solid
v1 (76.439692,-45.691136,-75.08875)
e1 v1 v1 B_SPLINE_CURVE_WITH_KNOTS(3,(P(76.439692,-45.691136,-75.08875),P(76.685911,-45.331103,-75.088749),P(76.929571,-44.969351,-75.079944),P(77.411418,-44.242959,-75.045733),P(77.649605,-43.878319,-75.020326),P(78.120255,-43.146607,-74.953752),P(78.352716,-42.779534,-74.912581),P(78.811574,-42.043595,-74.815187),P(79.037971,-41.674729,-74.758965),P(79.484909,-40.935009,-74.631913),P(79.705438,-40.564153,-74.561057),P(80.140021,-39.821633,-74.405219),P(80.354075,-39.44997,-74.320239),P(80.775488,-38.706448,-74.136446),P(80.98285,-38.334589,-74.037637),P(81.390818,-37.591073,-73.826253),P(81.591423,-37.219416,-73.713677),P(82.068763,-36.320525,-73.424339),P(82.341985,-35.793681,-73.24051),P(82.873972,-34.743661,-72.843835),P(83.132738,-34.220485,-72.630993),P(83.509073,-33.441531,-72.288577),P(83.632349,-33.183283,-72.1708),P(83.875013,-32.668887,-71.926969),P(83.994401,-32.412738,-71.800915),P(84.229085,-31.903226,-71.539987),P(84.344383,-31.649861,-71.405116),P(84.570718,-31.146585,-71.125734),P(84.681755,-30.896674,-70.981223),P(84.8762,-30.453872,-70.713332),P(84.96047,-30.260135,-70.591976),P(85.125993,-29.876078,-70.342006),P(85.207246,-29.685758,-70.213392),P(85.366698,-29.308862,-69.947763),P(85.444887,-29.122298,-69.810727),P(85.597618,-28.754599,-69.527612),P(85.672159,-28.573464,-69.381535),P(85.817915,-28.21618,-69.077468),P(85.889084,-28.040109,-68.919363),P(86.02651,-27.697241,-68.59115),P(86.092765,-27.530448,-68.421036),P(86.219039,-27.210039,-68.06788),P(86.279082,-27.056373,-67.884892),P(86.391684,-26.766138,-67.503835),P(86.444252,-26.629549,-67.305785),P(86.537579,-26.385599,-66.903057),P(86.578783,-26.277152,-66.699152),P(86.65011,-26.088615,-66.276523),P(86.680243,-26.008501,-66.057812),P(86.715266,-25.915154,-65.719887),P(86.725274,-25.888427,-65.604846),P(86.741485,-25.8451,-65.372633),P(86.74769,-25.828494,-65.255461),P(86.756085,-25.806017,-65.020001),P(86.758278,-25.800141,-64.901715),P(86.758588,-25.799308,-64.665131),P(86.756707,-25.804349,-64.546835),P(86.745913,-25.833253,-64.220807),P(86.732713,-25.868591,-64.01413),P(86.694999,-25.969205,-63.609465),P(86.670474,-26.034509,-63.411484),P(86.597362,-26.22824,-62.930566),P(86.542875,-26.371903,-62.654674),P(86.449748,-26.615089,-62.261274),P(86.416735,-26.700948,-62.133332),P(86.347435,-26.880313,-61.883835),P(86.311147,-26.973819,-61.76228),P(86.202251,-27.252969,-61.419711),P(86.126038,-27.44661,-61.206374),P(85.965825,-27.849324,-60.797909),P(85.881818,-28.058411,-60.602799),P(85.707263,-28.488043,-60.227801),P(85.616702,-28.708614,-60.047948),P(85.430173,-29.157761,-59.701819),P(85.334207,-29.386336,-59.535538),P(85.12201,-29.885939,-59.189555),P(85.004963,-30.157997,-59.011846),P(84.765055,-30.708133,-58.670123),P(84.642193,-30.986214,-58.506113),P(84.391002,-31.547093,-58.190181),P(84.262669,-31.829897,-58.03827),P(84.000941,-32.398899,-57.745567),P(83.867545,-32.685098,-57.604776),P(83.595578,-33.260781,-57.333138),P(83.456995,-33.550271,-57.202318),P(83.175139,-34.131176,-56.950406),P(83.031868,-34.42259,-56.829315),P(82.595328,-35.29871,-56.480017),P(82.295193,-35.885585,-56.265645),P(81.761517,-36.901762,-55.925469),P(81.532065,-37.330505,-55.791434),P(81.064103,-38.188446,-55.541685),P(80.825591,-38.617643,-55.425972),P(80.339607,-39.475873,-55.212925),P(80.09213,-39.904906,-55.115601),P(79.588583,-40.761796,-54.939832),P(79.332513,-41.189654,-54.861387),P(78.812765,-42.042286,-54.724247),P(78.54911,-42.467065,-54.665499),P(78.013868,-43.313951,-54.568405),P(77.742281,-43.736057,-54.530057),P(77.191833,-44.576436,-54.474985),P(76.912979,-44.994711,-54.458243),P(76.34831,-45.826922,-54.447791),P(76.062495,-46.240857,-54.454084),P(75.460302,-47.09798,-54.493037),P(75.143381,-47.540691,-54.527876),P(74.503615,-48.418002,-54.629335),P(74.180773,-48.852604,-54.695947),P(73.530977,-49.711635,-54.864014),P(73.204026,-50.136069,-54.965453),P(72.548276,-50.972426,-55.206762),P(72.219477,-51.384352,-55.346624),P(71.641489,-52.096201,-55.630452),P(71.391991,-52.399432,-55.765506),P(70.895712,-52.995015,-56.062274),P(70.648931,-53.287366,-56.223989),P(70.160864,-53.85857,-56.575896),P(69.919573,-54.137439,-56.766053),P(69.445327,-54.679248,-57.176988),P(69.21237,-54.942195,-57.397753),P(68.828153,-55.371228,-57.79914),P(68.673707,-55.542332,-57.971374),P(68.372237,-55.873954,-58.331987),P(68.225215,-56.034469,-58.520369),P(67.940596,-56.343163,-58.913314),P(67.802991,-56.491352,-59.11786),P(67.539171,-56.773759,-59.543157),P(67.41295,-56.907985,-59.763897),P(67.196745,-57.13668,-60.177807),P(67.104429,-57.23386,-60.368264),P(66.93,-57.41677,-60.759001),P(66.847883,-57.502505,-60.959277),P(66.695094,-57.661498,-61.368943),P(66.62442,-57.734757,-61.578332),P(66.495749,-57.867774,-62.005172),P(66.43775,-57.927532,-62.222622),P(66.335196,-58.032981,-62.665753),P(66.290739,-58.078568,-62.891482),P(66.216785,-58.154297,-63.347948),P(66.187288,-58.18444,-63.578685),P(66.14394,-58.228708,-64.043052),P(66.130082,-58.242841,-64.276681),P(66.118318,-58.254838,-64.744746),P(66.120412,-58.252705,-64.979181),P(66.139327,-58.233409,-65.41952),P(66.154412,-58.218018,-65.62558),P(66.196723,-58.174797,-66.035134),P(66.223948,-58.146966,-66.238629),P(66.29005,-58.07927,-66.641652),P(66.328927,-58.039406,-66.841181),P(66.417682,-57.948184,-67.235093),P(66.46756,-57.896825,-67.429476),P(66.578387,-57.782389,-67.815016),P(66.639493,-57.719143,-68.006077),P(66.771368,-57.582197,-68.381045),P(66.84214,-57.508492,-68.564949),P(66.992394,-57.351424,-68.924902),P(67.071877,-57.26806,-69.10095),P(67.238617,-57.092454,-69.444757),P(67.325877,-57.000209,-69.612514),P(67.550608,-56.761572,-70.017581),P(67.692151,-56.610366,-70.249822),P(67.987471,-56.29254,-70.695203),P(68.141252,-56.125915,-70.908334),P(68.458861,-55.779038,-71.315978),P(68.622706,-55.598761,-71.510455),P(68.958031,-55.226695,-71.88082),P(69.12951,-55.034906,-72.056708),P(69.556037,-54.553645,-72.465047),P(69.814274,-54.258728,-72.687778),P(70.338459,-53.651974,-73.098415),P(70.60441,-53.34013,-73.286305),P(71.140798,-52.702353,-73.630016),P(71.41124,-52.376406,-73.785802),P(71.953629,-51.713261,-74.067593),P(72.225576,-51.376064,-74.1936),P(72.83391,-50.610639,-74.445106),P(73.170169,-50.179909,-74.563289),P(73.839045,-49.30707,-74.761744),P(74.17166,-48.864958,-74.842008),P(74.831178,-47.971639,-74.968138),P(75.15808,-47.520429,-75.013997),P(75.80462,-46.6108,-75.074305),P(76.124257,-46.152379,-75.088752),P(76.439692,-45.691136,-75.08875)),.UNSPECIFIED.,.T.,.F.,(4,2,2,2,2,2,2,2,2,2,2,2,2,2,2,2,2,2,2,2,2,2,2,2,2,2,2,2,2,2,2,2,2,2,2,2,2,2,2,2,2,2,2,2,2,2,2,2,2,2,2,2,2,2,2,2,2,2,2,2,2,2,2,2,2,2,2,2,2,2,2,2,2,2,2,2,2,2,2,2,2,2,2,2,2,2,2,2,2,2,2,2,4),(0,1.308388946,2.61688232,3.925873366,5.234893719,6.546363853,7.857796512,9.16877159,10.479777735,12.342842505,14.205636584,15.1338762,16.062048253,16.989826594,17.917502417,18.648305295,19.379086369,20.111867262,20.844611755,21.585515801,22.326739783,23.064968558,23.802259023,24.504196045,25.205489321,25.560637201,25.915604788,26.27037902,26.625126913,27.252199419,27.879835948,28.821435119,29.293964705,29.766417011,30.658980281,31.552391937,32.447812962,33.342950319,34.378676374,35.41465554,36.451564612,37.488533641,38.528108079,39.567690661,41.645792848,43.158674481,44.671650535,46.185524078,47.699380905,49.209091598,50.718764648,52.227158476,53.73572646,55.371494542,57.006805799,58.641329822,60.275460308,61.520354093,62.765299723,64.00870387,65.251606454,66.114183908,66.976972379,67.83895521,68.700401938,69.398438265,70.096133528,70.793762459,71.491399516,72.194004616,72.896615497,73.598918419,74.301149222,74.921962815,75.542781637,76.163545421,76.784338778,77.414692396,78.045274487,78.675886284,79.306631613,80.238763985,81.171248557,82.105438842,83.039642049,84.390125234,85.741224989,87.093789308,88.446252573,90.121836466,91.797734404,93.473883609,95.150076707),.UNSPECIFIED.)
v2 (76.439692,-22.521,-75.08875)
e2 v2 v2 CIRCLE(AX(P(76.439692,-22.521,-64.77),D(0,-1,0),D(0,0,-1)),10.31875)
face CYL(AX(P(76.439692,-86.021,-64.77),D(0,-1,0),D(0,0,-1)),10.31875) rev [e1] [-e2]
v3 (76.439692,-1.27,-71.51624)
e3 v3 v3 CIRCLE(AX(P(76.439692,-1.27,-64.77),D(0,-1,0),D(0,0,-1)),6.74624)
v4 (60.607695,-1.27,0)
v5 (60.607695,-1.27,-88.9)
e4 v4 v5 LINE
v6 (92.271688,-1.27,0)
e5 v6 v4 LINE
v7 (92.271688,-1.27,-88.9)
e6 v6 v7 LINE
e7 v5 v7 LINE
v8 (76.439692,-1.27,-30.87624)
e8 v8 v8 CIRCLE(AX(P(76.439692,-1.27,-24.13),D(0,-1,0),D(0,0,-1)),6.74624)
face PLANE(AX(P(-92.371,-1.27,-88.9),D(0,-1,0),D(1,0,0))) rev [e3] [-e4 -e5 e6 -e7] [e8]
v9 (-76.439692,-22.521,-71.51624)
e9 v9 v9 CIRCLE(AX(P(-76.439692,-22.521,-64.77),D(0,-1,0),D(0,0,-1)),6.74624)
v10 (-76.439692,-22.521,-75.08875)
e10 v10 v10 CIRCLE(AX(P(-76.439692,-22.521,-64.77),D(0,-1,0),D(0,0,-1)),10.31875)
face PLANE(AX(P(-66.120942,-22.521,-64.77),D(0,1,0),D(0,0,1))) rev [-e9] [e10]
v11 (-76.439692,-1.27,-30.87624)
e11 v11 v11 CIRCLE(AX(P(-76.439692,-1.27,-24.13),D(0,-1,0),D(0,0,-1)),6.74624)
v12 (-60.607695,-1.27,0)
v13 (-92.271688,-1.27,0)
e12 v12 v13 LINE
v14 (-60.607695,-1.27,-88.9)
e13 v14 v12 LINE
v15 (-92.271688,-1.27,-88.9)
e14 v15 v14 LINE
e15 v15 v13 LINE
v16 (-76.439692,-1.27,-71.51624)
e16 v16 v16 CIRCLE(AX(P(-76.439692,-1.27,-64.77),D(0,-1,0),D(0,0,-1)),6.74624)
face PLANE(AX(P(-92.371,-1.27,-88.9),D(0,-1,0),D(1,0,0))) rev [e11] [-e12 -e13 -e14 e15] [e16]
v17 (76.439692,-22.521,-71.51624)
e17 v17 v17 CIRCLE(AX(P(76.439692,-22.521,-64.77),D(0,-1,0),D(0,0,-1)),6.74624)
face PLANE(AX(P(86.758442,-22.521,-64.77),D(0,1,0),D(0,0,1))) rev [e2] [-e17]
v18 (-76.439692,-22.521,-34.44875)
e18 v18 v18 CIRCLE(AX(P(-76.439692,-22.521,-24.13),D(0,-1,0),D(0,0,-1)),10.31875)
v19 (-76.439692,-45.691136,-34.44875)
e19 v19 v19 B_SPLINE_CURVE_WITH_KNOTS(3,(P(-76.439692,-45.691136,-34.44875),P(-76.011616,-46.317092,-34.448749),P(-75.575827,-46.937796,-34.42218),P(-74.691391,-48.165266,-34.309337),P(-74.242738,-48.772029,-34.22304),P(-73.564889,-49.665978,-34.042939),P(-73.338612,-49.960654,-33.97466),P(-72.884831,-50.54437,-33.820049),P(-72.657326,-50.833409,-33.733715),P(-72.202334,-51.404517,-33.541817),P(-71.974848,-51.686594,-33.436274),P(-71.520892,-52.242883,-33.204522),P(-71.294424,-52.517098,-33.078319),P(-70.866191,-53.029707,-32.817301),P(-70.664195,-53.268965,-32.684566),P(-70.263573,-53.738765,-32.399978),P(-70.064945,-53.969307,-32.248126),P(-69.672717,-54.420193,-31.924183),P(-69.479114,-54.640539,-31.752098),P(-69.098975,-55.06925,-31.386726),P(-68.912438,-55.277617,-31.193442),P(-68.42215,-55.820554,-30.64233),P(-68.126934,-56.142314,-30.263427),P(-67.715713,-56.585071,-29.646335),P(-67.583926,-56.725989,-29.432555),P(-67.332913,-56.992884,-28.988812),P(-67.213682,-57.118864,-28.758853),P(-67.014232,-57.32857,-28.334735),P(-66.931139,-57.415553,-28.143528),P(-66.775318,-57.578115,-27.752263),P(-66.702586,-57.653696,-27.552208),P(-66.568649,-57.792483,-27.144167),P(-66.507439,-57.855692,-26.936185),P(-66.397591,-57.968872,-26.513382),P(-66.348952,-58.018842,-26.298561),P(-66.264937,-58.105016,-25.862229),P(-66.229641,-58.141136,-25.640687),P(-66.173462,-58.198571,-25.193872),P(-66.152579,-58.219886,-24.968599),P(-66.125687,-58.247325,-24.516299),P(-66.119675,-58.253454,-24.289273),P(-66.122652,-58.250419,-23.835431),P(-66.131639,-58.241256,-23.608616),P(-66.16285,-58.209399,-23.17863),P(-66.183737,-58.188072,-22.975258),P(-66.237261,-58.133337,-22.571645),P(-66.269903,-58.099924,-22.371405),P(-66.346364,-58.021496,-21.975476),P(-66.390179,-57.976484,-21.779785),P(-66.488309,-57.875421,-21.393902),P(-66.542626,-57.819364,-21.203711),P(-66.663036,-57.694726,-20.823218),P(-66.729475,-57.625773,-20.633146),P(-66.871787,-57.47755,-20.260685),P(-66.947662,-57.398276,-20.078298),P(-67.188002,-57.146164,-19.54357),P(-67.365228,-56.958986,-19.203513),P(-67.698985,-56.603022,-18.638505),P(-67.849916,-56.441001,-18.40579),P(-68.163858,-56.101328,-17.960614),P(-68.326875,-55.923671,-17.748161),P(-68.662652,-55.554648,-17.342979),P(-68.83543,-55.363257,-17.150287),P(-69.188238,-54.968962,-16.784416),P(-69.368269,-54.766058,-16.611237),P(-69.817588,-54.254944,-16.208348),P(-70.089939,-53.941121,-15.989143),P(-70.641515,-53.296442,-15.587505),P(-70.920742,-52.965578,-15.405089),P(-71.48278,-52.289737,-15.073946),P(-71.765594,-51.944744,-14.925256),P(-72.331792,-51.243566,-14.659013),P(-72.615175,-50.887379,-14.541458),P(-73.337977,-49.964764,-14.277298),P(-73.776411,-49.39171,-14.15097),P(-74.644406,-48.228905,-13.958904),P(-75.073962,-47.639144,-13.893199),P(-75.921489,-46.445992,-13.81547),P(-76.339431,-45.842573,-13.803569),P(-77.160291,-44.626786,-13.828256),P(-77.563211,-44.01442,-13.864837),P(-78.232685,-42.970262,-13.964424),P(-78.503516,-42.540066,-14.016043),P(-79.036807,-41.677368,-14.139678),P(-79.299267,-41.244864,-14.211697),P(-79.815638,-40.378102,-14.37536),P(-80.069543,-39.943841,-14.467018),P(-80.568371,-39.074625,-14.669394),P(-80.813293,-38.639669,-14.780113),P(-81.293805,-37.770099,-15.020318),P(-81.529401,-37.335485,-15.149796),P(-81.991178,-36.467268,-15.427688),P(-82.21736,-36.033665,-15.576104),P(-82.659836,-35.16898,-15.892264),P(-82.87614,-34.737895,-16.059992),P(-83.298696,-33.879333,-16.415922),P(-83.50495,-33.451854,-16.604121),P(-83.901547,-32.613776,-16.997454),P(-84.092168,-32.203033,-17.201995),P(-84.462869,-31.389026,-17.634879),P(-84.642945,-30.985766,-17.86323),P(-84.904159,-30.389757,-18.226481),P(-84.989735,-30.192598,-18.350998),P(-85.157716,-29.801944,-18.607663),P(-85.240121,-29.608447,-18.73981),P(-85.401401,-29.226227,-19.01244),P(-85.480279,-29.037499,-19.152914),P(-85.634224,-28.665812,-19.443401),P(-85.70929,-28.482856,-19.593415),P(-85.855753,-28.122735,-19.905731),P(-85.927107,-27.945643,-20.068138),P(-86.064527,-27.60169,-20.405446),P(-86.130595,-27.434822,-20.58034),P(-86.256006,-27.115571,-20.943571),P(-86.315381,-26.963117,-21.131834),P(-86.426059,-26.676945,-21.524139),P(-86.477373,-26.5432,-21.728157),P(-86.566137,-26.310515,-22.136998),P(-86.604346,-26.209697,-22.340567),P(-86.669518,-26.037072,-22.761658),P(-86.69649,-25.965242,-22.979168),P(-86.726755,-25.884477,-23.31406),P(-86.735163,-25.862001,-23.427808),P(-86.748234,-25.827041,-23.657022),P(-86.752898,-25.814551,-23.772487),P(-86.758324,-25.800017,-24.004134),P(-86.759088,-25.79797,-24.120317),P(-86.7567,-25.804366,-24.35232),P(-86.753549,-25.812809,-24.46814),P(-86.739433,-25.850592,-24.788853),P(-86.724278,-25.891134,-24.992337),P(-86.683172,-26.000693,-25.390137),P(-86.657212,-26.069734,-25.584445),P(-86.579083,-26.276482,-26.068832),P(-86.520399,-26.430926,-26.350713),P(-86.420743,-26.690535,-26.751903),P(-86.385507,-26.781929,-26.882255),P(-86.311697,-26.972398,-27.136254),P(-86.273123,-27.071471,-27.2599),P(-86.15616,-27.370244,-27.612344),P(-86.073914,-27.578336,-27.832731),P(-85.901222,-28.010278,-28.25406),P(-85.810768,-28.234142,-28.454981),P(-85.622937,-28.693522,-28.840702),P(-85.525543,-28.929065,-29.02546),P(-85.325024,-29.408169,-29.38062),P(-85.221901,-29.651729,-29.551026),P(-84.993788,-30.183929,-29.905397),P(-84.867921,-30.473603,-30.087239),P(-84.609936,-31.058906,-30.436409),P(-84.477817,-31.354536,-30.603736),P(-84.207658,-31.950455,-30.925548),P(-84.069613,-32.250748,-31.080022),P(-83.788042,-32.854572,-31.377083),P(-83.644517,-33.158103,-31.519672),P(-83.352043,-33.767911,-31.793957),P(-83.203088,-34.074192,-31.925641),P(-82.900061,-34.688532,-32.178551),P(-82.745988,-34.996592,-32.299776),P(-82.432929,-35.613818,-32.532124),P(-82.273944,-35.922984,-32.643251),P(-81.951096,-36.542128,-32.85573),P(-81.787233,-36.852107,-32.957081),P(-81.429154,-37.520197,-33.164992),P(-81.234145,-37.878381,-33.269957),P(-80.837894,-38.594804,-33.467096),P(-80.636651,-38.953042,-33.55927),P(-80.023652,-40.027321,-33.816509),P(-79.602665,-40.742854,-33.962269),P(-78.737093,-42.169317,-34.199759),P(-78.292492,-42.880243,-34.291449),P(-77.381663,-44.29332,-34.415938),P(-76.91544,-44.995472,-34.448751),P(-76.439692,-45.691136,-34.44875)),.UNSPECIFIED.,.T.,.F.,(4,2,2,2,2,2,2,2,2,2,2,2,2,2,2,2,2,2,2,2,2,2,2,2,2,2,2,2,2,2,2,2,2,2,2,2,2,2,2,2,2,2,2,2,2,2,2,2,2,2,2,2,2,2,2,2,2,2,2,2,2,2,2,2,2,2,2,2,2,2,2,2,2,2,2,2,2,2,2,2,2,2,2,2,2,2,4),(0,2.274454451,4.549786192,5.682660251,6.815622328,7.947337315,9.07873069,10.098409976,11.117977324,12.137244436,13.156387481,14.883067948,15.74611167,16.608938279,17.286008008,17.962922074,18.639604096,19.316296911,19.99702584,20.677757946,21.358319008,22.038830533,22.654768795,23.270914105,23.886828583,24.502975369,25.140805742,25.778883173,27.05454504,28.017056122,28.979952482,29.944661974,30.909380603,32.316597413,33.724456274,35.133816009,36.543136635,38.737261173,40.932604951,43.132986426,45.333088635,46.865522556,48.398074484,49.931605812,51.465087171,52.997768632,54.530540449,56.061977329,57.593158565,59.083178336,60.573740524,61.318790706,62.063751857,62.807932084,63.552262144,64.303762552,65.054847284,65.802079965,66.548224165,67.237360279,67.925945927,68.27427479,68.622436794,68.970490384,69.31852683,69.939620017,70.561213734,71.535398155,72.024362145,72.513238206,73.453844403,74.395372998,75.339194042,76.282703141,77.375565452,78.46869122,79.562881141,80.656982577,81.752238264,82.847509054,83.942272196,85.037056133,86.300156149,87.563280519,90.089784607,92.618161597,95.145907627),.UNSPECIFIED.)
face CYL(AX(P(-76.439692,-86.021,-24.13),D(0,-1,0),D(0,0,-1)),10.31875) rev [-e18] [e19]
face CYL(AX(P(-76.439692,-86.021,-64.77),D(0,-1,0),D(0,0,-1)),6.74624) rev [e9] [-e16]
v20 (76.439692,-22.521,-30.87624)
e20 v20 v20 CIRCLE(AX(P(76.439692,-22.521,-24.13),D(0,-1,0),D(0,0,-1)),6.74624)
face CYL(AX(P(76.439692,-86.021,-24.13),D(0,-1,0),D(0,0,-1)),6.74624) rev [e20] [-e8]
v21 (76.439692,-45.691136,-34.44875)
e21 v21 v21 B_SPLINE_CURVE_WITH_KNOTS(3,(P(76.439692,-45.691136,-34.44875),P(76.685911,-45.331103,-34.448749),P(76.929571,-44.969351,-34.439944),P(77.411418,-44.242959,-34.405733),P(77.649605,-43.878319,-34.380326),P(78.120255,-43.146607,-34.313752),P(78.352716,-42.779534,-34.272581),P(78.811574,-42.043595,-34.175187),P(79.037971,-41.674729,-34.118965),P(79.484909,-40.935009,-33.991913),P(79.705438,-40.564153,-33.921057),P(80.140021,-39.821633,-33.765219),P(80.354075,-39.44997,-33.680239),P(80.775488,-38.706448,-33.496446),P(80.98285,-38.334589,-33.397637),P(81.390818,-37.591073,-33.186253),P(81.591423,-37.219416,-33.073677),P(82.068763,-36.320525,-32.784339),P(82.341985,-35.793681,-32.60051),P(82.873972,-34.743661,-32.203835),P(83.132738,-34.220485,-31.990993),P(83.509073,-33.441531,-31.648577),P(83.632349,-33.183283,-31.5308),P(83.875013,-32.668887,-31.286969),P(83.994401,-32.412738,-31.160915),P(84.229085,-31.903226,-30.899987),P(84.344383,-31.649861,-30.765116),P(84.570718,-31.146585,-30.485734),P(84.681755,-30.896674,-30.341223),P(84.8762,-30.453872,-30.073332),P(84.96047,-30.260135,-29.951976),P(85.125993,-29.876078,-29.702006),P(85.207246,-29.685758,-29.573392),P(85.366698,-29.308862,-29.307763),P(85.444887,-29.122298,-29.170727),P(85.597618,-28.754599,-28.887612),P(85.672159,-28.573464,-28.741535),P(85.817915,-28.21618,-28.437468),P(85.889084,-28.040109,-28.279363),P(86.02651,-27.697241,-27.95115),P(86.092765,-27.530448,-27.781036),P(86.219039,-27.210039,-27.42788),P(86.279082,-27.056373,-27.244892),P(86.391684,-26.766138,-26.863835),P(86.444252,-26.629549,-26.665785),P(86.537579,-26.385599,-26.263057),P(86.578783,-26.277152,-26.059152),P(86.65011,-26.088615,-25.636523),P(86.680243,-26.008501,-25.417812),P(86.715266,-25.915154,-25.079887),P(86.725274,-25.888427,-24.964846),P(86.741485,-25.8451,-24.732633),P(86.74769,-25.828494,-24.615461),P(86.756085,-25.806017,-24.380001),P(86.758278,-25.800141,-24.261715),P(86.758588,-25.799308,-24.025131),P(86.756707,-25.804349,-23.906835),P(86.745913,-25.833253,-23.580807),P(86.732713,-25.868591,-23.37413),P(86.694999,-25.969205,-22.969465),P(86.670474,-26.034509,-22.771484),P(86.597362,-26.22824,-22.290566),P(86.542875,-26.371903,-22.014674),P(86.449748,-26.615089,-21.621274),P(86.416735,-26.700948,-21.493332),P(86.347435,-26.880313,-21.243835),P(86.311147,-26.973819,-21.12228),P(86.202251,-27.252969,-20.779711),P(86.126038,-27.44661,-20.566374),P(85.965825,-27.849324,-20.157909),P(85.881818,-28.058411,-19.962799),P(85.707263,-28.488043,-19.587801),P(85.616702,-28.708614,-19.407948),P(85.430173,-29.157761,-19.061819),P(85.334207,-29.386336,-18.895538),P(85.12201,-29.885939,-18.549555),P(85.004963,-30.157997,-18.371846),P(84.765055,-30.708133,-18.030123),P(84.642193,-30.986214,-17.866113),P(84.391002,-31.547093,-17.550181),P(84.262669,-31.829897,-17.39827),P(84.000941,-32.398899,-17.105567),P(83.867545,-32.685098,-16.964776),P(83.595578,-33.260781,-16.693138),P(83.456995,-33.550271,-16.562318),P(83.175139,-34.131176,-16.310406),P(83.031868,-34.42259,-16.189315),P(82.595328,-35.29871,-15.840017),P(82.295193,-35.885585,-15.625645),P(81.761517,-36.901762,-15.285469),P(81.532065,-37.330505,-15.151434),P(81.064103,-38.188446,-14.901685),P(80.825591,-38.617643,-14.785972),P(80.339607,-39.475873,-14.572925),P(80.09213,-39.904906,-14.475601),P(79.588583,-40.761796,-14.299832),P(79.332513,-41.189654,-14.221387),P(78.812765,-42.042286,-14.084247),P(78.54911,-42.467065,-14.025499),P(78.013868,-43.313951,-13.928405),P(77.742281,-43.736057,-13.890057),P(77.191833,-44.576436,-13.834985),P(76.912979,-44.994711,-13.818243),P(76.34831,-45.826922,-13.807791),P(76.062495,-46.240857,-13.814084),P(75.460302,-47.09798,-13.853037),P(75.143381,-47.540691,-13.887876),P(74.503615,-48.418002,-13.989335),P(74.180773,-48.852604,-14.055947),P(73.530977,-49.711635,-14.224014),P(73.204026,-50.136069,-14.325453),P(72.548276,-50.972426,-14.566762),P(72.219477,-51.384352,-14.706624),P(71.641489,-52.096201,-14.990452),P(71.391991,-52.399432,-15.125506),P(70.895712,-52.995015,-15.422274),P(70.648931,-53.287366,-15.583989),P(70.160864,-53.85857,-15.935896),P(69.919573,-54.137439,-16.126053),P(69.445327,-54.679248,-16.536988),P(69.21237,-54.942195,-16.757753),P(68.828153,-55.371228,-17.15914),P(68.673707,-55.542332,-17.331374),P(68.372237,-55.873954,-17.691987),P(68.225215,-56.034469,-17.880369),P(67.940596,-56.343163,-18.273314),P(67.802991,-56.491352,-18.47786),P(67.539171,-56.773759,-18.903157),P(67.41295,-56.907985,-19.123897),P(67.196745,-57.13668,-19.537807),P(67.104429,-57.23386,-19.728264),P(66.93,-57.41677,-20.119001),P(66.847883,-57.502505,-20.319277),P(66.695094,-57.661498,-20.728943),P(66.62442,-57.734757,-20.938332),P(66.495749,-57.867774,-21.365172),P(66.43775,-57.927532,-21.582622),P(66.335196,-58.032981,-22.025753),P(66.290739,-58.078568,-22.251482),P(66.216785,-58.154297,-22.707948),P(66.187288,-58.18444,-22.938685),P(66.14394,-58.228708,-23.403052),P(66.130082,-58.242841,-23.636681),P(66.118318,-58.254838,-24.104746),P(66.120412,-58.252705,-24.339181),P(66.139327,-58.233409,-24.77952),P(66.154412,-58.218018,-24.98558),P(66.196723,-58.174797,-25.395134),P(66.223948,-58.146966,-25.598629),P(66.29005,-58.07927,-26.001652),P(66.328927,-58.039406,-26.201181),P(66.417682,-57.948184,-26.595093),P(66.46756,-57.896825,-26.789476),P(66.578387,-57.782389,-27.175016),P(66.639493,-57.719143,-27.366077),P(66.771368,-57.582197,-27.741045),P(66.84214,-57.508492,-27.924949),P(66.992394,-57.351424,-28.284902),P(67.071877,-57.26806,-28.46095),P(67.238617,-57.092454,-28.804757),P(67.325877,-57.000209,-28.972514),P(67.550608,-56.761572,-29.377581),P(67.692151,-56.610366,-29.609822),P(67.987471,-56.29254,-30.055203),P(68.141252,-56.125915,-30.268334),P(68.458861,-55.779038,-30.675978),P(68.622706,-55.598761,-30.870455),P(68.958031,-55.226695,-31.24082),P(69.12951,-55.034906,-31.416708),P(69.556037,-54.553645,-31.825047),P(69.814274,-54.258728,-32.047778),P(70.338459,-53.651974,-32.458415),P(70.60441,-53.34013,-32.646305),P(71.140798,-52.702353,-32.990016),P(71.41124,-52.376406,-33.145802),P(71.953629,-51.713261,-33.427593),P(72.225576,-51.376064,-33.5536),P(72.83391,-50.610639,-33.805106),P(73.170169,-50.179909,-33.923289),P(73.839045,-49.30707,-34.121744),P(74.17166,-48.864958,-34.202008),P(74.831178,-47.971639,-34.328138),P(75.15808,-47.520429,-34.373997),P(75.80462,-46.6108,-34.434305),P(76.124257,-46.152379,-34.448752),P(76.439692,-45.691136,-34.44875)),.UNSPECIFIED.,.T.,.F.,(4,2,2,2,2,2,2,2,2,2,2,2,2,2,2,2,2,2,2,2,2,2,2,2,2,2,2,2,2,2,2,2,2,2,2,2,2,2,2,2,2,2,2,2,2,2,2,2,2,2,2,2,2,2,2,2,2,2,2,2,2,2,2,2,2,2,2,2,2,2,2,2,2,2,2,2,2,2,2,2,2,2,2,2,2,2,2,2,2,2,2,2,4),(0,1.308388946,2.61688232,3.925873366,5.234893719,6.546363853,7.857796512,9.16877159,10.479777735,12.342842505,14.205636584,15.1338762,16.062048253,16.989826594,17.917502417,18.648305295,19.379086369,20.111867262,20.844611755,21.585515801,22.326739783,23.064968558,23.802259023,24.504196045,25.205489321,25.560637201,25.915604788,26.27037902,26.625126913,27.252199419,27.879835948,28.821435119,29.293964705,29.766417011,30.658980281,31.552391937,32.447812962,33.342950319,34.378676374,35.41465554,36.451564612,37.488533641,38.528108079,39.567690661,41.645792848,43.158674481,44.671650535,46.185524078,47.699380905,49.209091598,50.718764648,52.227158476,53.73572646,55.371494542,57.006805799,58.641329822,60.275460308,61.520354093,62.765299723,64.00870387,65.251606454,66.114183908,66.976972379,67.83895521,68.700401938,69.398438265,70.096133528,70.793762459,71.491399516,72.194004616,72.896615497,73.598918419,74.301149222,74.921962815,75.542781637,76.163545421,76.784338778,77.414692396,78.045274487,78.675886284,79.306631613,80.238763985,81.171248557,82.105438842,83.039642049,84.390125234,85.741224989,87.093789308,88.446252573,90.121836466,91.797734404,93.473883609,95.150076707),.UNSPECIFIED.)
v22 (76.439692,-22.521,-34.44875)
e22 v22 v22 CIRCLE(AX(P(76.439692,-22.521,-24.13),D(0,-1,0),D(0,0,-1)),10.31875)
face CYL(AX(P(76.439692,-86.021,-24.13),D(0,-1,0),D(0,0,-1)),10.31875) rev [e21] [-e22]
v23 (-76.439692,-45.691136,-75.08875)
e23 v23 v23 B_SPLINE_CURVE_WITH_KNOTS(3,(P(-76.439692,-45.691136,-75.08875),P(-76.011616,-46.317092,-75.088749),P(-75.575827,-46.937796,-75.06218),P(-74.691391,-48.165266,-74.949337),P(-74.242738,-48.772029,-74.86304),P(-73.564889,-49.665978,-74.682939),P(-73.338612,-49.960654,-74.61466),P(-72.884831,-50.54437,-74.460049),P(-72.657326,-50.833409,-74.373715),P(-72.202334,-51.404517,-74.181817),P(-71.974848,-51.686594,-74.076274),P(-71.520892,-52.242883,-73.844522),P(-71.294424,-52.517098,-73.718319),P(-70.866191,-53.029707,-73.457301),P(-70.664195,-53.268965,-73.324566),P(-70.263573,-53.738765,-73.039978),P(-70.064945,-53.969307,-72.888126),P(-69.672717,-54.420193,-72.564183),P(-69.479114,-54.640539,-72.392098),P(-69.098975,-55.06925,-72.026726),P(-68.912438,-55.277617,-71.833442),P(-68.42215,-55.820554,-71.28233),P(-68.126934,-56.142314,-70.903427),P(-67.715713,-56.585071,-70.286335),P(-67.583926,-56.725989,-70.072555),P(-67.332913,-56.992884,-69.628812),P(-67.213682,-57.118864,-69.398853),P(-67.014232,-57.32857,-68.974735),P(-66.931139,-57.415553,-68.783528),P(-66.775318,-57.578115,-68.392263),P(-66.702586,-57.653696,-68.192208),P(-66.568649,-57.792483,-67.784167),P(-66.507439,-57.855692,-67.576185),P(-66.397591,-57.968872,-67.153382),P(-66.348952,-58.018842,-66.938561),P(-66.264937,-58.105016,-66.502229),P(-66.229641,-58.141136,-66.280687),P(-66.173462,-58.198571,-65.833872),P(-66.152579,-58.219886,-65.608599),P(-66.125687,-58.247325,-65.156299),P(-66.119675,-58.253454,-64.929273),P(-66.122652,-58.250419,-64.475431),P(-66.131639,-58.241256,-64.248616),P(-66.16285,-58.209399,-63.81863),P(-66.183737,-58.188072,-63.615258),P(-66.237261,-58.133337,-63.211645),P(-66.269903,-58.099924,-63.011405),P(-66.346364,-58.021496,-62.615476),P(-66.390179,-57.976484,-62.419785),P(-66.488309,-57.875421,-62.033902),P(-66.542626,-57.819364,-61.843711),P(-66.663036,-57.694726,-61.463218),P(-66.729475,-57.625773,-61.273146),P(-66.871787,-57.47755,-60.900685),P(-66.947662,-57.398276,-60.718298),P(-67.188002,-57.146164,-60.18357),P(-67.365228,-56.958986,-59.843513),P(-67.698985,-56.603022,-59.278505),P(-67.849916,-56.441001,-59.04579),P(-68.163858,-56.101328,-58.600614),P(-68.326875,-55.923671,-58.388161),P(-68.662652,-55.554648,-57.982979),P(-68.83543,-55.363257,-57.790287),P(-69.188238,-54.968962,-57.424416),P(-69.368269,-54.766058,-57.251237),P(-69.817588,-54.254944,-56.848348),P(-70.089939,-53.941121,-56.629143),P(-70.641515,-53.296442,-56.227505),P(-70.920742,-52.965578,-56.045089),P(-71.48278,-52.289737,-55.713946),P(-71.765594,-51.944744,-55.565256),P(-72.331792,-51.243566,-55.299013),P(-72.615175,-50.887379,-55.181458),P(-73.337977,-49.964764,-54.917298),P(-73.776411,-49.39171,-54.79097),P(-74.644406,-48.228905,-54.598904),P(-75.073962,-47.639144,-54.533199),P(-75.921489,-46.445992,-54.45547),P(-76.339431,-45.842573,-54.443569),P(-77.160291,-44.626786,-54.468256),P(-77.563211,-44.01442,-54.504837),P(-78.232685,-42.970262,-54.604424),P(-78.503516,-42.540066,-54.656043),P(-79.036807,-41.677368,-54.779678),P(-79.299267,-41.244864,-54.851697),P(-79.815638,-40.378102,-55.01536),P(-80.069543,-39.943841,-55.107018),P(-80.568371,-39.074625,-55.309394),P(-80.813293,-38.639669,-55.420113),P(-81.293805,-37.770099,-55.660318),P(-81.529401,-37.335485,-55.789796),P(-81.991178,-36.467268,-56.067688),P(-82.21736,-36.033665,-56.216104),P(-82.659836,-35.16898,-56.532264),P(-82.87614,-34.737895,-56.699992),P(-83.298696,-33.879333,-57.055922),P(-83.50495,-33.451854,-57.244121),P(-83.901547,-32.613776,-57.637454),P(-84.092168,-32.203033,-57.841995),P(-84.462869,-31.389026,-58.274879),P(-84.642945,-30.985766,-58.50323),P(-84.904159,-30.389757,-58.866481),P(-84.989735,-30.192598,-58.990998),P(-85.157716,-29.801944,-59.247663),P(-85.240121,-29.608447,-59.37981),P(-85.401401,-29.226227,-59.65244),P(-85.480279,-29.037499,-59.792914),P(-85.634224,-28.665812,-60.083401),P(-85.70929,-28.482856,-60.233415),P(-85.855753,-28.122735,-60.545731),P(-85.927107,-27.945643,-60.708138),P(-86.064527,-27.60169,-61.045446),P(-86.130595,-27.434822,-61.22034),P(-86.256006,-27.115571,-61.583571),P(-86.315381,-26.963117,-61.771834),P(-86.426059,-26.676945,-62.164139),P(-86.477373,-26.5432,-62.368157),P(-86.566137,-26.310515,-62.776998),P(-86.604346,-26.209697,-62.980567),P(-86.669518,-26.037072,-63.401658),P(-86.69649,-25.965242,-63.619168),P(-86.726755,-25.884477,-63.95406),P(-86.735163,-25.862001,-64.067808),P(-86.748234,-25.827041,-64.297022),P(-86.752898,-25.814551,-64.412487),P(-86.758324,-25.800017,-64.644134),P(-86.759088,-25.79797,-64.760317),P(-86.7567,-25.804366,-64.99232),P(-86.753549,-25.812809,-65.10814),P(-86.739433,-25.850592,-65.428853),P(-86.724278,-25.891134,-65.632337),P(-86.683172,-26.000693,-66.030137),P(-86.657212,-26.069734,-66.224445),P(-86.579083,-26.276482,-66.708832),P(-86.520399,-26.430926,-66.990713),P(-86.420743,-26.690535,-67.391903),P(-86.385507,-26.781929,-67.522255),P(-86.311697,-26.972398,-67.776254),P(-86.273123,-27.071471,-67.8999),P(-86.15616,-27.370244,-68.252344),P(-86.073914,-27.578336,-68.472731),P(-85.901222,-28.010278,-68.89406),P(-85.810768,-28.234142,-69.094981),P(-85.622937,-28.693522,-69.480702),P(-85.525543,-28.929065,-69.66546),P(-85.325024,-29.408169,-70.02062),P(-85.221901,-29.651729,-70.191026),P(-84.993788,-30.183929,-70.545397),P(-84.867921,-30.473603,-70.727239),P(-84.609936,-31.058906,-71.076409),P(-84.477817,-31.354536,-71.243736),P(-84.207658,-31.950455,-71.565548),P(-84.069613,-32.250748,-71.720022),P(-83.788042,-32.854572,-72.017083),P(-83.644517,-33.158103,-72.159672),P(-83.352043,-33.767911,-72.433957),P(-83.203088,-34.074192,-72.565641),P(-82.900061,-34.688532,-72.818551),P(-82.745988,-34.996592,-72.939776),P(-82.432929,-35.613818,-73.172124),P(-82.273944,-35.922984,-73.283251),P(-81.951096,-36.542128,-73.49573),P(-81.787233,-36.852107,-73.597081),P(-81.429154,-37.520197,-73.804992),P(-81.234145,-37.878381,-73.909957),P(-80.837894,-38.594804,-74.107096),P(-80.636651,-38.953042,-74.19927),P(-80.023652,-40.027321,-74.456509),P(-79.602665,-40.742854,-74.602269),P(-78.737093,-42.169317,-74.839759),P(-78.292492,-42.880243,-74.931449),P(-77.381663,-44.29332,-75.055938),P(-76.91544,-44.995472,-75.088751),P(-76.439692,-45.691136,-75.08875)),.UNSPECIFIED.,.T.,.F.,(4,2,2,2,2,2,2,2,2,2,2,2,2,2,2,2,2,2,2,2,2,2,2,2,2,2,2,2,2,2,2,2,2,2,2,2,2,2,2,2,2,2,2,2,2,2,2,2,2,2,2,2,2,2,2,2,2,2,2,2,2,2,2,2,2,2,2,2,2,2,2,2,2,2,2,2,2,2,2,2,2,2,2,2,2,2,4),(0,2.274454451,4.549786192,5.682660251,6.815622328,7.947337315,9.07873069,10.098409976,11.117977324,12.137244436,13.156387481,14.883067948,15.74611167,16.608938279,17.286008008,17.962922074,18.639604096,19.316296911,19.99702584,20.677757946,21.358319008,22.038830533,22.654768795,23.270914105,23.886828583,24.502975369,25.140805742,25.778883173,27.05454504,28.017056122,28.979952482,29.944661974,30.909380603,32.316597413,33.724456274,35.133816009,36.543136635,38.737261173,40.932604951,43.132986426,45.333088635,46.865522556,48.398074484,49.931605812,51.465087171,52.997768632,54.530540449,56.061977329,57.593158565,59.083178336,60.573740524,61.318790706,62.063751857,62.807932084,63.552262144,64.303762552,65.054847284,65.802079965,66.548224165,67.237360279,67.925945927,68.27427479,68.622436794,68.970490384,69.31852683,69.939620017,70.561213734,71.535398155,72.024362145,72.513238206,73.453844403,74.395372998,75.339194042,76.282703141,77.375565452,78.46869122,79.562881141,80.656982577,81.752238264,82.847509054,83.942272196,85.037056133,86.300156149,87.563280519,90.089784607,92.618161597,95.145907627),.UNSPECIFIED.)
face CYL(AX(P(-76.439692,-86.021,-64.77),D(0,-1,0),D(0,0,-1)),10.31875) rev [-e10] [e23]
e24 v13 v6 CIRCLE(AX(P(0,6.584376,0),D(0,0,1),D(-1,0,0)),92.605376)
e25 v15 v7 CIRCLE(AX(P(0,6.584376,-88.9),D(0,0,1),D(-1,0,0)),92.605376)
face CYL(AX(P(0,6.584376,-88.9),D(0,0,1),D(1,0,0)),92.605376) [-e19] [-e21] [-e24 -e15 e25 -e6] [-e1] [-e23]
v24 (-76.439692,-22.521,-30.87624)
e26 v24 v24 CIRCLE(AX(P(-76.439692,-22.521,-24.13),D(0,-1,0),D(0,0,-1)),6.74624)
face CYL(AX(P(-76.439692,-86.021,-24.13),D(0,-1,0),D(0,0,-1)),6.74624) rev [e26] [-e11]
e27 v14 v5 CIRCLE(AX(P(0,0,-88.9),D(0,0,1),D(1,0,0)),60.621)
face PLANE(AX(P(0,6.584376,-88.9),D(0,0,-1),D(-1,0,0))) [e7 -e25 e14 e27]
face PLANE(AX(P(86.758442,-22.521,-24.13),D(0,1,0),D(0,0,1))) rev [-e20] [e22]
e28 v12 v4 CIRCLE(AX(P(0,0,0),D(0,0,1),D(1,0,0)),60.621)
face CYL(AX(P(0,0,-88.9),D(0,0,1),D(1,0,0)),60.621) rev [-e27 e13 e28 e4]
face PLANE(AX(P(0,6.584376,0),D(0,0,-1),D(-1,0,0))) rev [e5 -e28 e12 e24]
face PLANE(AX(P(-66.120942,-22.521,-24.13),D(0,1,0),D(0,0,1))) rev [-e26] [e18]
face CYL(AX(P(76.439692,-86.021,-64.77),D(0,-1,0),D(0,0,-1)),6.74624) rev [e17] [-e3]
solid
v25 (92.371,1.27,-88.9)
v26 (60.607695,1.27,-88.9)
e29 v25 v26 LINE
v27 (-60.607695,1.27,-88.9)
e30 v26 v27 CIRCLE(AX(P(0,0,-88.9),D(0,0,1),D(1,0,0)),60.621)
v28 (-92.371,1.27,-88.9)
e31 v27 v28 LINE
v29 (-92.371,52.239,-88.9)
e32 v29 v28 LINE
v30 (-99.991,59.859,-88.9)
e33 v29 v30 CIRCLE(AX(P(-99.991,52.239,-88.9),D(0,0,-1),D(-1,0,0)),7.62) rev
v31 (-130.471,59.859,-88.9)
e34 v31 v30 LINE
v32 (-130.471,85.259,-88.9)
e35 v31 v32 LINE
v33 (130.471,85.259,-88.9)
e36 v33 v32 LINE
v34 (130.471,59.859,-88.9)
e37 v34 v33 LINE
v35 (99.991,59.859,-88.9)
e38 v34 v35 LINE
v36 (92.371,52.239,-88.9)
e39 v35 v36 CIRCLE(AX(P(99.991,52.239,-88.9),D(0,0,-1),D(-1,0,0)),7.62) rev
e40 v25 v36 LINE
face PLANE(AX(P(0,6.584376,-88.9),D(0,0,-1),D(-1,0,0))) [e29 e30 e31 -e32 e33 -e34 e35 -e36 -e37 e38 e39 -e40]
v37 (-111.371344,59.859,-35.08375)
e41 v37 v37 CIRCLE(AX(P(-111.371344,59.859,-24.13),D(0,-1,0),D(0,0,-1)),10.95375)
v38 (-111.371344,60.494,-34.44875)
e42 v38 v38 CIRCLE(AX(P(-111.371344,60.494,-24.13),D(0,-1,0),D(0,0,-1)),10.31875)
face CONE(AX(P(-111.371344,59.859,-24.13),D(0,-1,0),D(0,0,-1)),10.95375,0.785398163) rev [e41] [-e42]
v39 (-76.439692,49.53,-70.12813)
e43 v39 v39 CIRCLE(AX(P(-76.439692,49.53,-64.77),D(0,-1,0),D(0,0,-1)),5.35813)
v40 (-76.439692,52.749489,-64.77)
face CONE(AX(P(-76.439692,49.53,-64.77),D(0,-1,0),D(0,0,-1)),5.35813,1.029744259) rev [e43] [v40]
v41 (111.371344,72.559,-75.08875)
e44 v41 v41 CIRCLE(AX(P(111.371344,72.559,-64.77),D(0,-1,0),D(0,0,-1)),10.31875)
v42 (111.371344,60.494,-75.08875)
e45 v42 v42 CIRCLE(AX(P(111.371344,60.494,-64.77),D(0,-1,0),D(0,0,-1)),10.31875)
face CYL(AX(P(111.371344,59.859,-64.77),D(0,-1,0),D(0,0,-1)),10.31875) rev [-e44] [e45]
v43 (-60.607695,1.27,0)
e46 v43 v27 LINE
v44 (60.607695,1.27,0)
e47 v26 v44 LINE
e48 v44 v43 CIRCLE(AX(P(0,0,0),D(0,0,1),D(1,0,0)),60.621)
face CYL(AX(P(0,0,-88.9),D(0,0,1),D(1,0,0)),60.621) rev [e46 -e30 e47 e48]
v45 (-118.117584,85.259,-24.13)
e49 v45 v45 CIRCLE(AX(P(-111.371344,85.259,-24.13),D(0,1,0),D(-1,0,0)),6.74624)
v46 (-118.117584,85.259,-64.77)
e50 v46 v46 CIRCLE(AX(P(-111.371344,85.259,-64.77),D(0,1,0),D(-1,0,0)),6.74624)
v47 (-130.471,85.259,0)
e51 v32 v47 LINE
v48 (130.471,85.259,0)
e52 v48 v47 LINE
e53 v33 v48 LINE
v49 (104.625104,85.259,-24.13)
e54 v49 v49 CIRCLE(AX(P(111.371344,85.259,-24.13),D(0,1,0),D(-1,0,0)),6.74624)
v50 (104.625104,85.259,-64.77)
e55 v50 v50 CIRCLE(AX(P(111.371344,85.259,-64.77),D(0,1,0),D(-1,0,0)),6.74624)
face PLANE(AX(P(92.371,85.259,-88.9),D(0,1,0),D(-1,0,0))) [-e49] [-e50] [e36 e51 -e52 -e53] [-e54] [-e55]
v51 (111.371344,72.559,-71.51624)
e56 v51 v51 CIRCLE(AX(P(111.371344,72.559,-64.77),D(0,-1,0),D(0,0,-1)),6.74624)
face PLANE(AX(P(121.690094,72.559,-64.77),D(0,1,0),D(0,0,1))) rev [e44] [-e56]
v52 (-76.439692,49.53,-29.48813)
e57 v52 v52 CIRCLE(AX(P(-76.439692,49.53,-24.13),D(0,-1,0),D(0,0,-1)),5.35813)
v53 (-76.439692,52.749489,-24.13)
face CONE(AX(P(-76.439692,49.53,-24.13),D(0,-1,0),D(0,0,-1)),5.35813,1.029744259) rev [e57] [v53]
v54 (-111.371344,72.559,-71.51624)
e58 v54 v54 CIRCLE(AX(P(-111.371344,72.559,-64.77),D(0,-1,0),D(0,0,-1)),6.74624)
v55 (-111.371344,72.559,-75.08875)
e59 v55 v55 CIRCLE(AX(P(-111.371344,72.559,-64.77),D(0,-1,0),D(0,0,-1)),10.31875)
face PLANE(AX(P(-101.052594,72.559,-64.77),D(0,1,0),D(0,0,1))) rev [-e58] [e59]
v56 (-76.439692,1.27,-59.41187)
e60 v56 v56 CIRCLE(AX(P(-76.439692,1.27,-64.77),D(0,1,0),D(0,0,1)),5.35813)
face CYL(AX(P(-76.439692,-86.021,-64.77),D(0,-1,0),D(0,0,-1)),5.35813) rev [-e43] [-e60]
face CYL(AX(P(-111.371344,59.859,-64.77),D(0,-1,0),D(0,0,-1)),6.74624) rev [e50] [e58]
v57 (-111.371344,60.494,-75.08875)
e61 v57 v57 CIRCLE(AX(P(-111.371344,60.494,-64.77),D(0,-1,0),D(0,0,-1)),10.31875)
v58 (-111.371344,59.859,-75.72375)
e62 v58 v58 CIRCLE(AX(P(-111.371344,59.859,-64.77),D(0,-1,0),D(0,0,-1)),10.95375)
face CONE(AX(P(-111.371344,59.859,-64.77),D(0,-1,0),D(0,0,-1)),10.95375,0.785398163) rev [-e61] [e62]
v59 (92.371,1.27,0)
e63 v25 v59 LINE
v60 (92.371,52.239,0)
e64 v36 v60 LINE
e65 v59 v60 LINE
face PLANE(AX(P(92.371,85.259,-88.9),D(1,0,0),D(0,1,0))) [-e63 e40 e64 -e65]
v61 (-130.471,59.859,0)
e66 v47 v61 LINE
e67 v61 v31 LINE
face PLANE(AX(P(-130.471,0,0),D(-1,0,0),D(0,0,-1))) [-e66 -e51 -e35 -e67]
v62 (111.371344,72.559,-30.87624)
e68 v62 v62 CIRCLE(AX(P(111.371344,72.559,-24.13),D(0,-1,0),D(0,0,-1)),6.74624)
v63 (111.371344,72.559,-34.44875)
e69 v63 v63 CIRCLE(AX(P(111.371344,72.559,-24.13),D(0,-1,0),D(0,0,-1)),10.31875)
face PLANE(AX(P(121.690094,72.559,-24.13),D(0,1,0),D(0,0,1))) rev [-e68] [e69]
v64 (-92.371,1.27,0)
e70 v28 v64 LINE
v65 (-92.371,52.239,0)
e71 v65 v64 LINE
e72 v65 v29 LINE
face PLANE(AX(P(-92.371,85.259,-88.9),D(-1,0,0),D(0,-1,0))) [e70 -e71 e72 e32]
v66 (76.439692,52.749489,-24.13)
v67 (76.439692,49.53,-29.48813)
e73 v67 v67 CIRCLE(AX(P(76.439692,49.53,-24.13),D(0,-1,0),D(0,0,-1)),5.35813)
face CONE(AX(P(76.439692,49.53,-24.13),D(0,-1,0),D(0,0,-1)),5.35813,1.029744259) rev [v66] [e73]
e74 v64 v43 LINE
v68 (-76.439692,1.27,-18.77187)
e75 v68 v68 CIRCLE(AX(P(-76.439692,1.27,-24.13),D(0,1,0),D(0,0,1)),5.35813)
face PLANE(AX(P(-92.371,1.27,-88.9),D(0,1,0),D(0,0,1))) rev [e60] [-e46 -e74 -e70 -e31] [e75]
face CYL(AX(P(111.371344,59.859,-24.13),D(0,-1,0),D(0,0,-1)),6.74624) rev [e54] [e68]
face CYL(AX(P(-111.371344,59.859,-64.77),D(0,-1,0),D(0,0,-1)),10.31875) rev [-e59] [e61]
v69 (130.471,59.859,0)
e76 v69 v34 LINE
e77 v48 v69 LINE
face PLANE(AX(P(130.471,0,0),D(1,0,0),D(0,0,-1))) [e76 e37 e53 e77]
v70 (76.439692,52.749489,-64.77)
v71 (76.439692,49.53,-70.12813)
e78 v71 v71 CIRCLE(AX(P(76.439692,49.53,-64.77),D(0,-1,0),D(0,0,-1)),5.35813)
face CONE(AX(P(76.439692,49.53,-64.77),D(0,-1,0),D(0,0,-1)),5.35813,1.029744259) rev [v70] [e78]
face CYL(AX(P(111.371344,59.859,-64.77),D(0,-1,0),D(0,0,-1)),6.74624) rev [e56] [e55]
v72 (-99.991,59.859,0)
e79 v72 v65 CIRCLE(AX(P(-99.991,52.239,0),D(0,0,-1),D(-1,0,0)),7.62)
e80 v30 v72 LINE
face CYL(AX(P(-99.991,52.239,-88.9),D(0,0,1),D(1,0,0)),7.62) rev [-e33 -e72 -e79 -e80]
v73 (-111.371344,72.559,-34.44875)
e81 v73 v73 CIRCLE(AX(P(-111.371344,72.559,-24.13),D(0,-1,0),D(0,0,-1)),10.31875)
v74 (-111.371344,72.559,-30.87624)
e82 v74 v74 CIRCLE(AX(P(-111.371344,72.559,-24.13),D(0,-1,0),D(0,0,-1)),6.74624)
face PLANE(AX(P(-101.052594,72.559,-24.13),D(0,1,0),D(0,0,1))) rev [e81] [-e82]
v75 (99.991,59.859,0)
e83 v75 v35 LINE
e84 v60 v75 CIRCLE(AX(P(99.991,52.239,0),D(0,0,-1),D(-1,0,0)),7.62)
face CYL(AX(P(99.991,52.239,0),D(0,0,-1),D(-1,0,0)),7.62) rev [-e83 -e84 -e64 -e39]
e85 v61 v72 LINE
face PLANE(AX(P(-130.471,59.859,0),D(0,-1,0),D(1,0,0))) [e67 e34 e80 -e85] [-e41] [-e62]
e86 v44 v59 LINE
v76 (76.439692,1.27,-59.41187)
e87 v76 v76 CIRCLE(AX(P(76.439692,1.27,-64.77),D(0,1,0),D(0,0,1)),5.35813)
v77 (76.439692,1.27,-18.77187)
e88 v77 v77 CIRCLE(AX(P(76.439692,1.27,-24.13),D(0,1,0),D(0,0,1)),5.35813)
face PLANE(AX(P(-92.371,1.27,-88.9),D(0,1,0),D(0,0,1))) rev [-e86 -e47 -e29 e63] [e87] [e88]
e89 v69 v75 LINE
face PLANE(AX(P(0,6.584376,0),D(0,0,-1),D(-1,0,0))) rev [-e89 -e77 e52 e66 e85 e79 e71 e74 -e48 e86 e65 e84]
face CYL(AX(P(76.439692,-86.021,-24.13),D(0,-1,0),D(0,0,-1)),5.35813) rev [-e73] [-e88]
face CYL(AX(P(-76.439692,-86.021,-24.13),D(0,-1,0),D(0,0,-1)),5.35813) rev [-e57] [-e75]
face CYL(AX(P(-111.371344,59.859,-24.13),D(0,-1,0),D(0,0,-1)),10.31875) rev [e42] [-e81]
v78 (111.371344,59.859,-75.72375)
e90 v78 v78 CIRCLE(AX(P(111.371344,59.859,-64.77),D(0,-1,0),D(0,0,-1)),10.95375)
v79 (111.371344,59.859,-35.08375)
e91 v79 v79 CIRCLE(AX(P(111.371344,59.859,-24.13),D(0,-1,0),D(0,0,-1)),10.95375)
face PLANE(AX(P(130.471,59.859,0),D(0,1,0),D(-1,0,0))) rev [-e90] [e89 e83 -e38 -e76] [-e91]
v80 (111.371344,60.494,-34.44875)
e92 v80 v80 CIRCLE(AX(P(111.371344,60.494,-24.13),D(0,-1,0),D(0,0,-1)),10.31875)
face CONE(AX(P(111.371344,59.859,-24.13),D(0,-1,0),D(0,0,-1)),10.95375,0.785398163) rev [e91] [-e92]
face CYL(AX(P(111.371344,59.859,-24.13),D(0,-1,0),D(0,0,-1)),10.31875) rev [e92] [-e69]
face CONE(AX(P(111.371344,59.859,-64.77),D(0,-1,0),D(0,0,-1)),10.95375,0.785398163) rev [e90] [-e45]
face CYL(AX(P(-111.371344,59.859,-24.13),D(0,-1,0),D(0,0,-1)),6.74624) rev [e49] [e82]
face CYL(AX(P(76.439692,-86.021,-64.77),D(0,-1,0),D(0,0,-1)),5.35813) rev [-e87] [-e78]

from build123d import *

# Parameters (mm, degrees)
SKETCH1_R                                     = 60.621
BOSS_EXTRUDE1_DEPTH                           = 88.9
CUT_EXTRUDE1_DEPTH                            = 155.386605902
CUT_EXTRUDE1_DEPTH_BACK                       = 155.386605902
SKETCH2_W                                     = 184.742
SKETCH2_H                                     = 2.54
ADVANCEDHOLE1_START                           = -58.252162376
ADVANCEDHOLE1_OUTLINE_R                       = 10.31875
ADVANCEDHOLE1_DEPTH                           = 35.731162376
ADVANCEDHOLE1_START_2                         = -22.521
ADVANCEDHOLE1_2_OUTLINE_R                     = 6.74624
ADVANCEDHOLE1_2_DEPTH                         = 21.251
SKETCH10_W                                    = 88.9
SKETCH10_H                                    = 25.4
BOSS_EXTRUDE2_DEPTH                           = 38.1
CBORE_FOR_1_2_SOCKET_HEAD_CAP_SCREW1_AT_COUNT = 2
CBORE_FOR_1_2_SOCKET_HEAD_CAP_SCREW1_AT_PITCH = 40.64
FILLET1_R                                     = 7.62


# Read off the part's stored shape, not the designer's step: AdvancedHole1
with BuildPart() as part:
    # Sketch1 → Boss-Extrude1 (new body)
    with BuildSketch(Plane.XY):
        with BuildLine():
            Line((92.371, 85.259), (-92.371, 85.259))
            Line((-92.371, 85.259), (-92.371, 0))
            ThreePointArc((-92.371, 0), (0, -86.021), (92.371, 0))
            Line((92.371, 0), (92.371, 85.259))
        make_face()
        Circle(SKETCH1_R, mode=Mode.SUBTRACT)
    extrude(amount=-BOSS_EXTRUDE1_DEPTH)

    # Sketch2 → Cut-Extrude1 (cut, two sides: drawn at the far end of the back side and taken through both)
    with BuildSketch(Plane.XY.offset(-CUT_EXTRUDE1_DEPTH_BACK)):
        Rectangle(SKETCH2_W, SKETCH2_H)
    extrude(amount=CUT_EXTRUDE1_DEPTH + CUT_EXTRUDE1_DEPTH_BACK, mode=Mode.SUBTRACT)


with BuildPart() as cut_extrude1_piece_1:
    # of the separate pieces the step leaves, piece 1, a body of its own (cut_extrude1_pieces)
    add(part.part.solids().sort_by_distance((92.371, 1.27, 0))[0])

    # AdvancedHole1 3 outline → AdvancedHole1 3 (revolve, cut)
    with BuildSketch(Plane(origin=(-76.439691751, 0, -64.77), x_dir=(1, 0, 0), z_dir=(0, 0, 1))):
        Polygon((5.35813, 1.27), (5.35813, 49.53), (0, 52.749489309), (0, 1.27), align=None)
    revolve(axis=Axis((-76.439691751, 0, -64.77), (0, 1, 0)), mode=Mode.SUBTRACT)

    # AdvancedHole1 4 outline → AdvancedHole1 4 (revolve, cut)
    with BuildSketch(Plane(origin=(-76.439691751, 0, -24.13), x_dir=(1, 0, 0), z_dir=(0, 0, 1))):
        Polygon((5.35813, 1.27), (5.35813, 49.53), (0, 52.749489309), (0, 1.27), align=None)
    revolve(axis=Axis((-76.439691751, 0, -24.13), (0, 1, 0)), mode=Mode.SUBTRACT)

    # AdvancedHole1 5 outline → AdvancedHole1 5 (revolve, cut)
    with BuildSketch(Plane(origin=(76.439691751, 0, -64.77), x_dir=(1, 0, 0), z_dir=(0, 0, 1))):
        Polygon((5.35813, 1.27), (5.35813, 49.53), (0, 52.749489309), (0, 1.27), align=None)
    revolve(axis=Axis((76.439691751, 0, -64.77), (0, 1, 0)), mode=Mode.SUBTRACT)

    # AdvancedHole1 6 outline → AdvancedHole1 6 (revolve, cut)
    with BuildSketch(Plane(origin=(76.439691751, 0, -24.13), x_dir=(1, 0, 0), z_dir=(0, 0, 1))):
        Polygon((5.35813, 1.27), (5.35813, 49.53), (0, 52.749489309), (0, 1.27), align=None)
    revolve(axis=Axis((76.439691751, 0, -24.13), (0, 1, 0)), mode=Mode.SUBTRACT)

    # Sketch10 → Boss-Extrude2 (add)
    with BuildSketch(Plane(origin=(92.371, 0, 0), x_dir=(0, 0, -1), z_dir=(1, 0, 0))):
        with Locations((44.45, 72.559)):
            Rectangle(SKETCH10_W, SKETCH10_H)
    boss_extrude2 = extrude(amount=BOSS_EXTRUDE2_DEPTH)

    # Sketch12 → CBORE for 1/2 Socket Head Cap Screw1 (revolve, cut)
    with BuildSketch(Plane(origin=(111.371344054, 59.859, -64.77), x_dir=(0, 0, -1), z_dir=(1, 0, 0))):
        Polygon((0, 0), (0, 25.401), (6.74624, 25.401), (6.74624, 12.7), (10.31875, 12.7), (10.31875, 0.635), (10.95375, 0), align=None)
    cbore_for_1_2_socket_head_cap_screw1 = revolve(axis=Axis((111.371344054, 53.509, -64.77), (0, 1, 0)), mode=Mode.SUBTRACT)

    # CBORE for 1/2 Socket Head Cap Screw1 at: CBORE for 1/2 Socket Head Cap Screw1 ×2
    with Locations(*[(0, 0, i * CBORE_FOR_1_2_SOCKET_HEAD_CAP_SCREW1_AT_PITCH) for i in range(1, CBORE_FOR_1_2_SOCKET_HEAD_CAP_SCREW1_AT_COUNT)]):
        add(cbore_for_1_2_socket_head_cap_screw1, mode=Mode.SUBTRACT)

    # Mirror1: Boss-Extrude2, CBORE for 1/2 Socket Head Cap Screw1 across plane
    add(boss_extrude2.mirror(Plane(origin=(0, 0, 0), x_dir=(0, 0, 1), z_dir=(1, 0, 0))))
    add(cbore_for_1_2_socket_head_cap_screw1.mirror(Plane(origin=(0, 0, 0), x_dir=(0, 0, 1), z_dir=(1, 0, 0))), mode=Mode.SUBTRACT)

    # Mirror1 copy 1 sketch → Mirror1 copy 1 (revolve, cut)
    with BuildSketch(Plane(origin=(-111.371344054, 59.859, -24.13), x_dir=(0, 0, -1), z_dir=(-1, 0, 0))):
        Polygon((0, 0), (0, -25.401), (6.74624, -25.401), (6.74624, -12.7), (10.31875, -12.7), (10.31875, -0.635), (10.95375, 0), align=None)
    revolve(axis=Axis((-111.371344054, 53.509, -24.13), (0, -1, 0)), mode=Mode.SUBTRACT)

    # Fillet1
    fillet1_edges = [cut_extrude1_piece_1.edges().sort_by_distance(p)[0] for p in [
        (92.371, 59.859, -44.45),
        (-92.371, 59.859, -44.45),
    ]]
    fillet(fillet1_edges, radius=FILLET1_R)


with BuildPart() as cut_extrude1_piece_2:
    # of the separate pieces the step leaves, piece 2, a body of its own (cut_extrude1_pieces)
    add(part.part.solids().sort_by_distance((-92.271688107, -1.27, 0))[0])

    # AdvancedHole1 outline → AdvancedHole1 (cut)
    with BuildSketch(Plane(origin=(0, 0, 0), x_dir=(1, 0, 0), z_dir=(0, 1, 0)).offset(ADVANCEDHOLE1_START)):
        with Locations((-76.439691751, 64.77)):
            Circle(ADVANCEDHOLE1_OUTLINE_R)
        with Locations((-76.439691751, 24.13)):
            Circle(ADVANCEDHOLE1_OUTLINE_R)
        with Locations((76.439691751, 64.77)):
            Circle(ADVANCEDHOLE1_OUTLINE_R)
        with Locations((76.439691751, 24.13)):
            Circle(ADVANCEDHOLE1_OUTLINE_R)
    extrude(amount=ADVANCEDHOLE1_DEPTH, mode=Mode.SUBTRACT)

    # AdvancedHole1 2 outline → AdvancedHole1 2 (cut)
    with BuildSketch(Plane(origin=(0, 0, 0), x_dir=(1, 0, 0), z_dir=(0, 1, 0)).offset(ADVANCEDHOLE1_START_2)):
        with Locations((-76.439691751, 64.77)):
            Circle(ADVANCEDHOLE1_2_OUTLINE_R)
        with Locations((-76.439691751, 24.13)):
            Circle(ADVANCEDHOLE1_2_OUTLINE_R)
        with Locations((76.439691751, 64.77)):
            Circle(ADVANCEDHOLE1_2_OUTLINE_R)
        with Locations((76.439691751, 24.13)):
            Circle(ADVANCEDHOLE1_2_OUTLINE_R)
    extrude(amount=ADVANCEDHOLE1_2_DEPTH, mode=Mode.SUBTRACT)


solid = Compound([cut_extrude1_piece_1.part, cut_extrude1_piece_2.part])
